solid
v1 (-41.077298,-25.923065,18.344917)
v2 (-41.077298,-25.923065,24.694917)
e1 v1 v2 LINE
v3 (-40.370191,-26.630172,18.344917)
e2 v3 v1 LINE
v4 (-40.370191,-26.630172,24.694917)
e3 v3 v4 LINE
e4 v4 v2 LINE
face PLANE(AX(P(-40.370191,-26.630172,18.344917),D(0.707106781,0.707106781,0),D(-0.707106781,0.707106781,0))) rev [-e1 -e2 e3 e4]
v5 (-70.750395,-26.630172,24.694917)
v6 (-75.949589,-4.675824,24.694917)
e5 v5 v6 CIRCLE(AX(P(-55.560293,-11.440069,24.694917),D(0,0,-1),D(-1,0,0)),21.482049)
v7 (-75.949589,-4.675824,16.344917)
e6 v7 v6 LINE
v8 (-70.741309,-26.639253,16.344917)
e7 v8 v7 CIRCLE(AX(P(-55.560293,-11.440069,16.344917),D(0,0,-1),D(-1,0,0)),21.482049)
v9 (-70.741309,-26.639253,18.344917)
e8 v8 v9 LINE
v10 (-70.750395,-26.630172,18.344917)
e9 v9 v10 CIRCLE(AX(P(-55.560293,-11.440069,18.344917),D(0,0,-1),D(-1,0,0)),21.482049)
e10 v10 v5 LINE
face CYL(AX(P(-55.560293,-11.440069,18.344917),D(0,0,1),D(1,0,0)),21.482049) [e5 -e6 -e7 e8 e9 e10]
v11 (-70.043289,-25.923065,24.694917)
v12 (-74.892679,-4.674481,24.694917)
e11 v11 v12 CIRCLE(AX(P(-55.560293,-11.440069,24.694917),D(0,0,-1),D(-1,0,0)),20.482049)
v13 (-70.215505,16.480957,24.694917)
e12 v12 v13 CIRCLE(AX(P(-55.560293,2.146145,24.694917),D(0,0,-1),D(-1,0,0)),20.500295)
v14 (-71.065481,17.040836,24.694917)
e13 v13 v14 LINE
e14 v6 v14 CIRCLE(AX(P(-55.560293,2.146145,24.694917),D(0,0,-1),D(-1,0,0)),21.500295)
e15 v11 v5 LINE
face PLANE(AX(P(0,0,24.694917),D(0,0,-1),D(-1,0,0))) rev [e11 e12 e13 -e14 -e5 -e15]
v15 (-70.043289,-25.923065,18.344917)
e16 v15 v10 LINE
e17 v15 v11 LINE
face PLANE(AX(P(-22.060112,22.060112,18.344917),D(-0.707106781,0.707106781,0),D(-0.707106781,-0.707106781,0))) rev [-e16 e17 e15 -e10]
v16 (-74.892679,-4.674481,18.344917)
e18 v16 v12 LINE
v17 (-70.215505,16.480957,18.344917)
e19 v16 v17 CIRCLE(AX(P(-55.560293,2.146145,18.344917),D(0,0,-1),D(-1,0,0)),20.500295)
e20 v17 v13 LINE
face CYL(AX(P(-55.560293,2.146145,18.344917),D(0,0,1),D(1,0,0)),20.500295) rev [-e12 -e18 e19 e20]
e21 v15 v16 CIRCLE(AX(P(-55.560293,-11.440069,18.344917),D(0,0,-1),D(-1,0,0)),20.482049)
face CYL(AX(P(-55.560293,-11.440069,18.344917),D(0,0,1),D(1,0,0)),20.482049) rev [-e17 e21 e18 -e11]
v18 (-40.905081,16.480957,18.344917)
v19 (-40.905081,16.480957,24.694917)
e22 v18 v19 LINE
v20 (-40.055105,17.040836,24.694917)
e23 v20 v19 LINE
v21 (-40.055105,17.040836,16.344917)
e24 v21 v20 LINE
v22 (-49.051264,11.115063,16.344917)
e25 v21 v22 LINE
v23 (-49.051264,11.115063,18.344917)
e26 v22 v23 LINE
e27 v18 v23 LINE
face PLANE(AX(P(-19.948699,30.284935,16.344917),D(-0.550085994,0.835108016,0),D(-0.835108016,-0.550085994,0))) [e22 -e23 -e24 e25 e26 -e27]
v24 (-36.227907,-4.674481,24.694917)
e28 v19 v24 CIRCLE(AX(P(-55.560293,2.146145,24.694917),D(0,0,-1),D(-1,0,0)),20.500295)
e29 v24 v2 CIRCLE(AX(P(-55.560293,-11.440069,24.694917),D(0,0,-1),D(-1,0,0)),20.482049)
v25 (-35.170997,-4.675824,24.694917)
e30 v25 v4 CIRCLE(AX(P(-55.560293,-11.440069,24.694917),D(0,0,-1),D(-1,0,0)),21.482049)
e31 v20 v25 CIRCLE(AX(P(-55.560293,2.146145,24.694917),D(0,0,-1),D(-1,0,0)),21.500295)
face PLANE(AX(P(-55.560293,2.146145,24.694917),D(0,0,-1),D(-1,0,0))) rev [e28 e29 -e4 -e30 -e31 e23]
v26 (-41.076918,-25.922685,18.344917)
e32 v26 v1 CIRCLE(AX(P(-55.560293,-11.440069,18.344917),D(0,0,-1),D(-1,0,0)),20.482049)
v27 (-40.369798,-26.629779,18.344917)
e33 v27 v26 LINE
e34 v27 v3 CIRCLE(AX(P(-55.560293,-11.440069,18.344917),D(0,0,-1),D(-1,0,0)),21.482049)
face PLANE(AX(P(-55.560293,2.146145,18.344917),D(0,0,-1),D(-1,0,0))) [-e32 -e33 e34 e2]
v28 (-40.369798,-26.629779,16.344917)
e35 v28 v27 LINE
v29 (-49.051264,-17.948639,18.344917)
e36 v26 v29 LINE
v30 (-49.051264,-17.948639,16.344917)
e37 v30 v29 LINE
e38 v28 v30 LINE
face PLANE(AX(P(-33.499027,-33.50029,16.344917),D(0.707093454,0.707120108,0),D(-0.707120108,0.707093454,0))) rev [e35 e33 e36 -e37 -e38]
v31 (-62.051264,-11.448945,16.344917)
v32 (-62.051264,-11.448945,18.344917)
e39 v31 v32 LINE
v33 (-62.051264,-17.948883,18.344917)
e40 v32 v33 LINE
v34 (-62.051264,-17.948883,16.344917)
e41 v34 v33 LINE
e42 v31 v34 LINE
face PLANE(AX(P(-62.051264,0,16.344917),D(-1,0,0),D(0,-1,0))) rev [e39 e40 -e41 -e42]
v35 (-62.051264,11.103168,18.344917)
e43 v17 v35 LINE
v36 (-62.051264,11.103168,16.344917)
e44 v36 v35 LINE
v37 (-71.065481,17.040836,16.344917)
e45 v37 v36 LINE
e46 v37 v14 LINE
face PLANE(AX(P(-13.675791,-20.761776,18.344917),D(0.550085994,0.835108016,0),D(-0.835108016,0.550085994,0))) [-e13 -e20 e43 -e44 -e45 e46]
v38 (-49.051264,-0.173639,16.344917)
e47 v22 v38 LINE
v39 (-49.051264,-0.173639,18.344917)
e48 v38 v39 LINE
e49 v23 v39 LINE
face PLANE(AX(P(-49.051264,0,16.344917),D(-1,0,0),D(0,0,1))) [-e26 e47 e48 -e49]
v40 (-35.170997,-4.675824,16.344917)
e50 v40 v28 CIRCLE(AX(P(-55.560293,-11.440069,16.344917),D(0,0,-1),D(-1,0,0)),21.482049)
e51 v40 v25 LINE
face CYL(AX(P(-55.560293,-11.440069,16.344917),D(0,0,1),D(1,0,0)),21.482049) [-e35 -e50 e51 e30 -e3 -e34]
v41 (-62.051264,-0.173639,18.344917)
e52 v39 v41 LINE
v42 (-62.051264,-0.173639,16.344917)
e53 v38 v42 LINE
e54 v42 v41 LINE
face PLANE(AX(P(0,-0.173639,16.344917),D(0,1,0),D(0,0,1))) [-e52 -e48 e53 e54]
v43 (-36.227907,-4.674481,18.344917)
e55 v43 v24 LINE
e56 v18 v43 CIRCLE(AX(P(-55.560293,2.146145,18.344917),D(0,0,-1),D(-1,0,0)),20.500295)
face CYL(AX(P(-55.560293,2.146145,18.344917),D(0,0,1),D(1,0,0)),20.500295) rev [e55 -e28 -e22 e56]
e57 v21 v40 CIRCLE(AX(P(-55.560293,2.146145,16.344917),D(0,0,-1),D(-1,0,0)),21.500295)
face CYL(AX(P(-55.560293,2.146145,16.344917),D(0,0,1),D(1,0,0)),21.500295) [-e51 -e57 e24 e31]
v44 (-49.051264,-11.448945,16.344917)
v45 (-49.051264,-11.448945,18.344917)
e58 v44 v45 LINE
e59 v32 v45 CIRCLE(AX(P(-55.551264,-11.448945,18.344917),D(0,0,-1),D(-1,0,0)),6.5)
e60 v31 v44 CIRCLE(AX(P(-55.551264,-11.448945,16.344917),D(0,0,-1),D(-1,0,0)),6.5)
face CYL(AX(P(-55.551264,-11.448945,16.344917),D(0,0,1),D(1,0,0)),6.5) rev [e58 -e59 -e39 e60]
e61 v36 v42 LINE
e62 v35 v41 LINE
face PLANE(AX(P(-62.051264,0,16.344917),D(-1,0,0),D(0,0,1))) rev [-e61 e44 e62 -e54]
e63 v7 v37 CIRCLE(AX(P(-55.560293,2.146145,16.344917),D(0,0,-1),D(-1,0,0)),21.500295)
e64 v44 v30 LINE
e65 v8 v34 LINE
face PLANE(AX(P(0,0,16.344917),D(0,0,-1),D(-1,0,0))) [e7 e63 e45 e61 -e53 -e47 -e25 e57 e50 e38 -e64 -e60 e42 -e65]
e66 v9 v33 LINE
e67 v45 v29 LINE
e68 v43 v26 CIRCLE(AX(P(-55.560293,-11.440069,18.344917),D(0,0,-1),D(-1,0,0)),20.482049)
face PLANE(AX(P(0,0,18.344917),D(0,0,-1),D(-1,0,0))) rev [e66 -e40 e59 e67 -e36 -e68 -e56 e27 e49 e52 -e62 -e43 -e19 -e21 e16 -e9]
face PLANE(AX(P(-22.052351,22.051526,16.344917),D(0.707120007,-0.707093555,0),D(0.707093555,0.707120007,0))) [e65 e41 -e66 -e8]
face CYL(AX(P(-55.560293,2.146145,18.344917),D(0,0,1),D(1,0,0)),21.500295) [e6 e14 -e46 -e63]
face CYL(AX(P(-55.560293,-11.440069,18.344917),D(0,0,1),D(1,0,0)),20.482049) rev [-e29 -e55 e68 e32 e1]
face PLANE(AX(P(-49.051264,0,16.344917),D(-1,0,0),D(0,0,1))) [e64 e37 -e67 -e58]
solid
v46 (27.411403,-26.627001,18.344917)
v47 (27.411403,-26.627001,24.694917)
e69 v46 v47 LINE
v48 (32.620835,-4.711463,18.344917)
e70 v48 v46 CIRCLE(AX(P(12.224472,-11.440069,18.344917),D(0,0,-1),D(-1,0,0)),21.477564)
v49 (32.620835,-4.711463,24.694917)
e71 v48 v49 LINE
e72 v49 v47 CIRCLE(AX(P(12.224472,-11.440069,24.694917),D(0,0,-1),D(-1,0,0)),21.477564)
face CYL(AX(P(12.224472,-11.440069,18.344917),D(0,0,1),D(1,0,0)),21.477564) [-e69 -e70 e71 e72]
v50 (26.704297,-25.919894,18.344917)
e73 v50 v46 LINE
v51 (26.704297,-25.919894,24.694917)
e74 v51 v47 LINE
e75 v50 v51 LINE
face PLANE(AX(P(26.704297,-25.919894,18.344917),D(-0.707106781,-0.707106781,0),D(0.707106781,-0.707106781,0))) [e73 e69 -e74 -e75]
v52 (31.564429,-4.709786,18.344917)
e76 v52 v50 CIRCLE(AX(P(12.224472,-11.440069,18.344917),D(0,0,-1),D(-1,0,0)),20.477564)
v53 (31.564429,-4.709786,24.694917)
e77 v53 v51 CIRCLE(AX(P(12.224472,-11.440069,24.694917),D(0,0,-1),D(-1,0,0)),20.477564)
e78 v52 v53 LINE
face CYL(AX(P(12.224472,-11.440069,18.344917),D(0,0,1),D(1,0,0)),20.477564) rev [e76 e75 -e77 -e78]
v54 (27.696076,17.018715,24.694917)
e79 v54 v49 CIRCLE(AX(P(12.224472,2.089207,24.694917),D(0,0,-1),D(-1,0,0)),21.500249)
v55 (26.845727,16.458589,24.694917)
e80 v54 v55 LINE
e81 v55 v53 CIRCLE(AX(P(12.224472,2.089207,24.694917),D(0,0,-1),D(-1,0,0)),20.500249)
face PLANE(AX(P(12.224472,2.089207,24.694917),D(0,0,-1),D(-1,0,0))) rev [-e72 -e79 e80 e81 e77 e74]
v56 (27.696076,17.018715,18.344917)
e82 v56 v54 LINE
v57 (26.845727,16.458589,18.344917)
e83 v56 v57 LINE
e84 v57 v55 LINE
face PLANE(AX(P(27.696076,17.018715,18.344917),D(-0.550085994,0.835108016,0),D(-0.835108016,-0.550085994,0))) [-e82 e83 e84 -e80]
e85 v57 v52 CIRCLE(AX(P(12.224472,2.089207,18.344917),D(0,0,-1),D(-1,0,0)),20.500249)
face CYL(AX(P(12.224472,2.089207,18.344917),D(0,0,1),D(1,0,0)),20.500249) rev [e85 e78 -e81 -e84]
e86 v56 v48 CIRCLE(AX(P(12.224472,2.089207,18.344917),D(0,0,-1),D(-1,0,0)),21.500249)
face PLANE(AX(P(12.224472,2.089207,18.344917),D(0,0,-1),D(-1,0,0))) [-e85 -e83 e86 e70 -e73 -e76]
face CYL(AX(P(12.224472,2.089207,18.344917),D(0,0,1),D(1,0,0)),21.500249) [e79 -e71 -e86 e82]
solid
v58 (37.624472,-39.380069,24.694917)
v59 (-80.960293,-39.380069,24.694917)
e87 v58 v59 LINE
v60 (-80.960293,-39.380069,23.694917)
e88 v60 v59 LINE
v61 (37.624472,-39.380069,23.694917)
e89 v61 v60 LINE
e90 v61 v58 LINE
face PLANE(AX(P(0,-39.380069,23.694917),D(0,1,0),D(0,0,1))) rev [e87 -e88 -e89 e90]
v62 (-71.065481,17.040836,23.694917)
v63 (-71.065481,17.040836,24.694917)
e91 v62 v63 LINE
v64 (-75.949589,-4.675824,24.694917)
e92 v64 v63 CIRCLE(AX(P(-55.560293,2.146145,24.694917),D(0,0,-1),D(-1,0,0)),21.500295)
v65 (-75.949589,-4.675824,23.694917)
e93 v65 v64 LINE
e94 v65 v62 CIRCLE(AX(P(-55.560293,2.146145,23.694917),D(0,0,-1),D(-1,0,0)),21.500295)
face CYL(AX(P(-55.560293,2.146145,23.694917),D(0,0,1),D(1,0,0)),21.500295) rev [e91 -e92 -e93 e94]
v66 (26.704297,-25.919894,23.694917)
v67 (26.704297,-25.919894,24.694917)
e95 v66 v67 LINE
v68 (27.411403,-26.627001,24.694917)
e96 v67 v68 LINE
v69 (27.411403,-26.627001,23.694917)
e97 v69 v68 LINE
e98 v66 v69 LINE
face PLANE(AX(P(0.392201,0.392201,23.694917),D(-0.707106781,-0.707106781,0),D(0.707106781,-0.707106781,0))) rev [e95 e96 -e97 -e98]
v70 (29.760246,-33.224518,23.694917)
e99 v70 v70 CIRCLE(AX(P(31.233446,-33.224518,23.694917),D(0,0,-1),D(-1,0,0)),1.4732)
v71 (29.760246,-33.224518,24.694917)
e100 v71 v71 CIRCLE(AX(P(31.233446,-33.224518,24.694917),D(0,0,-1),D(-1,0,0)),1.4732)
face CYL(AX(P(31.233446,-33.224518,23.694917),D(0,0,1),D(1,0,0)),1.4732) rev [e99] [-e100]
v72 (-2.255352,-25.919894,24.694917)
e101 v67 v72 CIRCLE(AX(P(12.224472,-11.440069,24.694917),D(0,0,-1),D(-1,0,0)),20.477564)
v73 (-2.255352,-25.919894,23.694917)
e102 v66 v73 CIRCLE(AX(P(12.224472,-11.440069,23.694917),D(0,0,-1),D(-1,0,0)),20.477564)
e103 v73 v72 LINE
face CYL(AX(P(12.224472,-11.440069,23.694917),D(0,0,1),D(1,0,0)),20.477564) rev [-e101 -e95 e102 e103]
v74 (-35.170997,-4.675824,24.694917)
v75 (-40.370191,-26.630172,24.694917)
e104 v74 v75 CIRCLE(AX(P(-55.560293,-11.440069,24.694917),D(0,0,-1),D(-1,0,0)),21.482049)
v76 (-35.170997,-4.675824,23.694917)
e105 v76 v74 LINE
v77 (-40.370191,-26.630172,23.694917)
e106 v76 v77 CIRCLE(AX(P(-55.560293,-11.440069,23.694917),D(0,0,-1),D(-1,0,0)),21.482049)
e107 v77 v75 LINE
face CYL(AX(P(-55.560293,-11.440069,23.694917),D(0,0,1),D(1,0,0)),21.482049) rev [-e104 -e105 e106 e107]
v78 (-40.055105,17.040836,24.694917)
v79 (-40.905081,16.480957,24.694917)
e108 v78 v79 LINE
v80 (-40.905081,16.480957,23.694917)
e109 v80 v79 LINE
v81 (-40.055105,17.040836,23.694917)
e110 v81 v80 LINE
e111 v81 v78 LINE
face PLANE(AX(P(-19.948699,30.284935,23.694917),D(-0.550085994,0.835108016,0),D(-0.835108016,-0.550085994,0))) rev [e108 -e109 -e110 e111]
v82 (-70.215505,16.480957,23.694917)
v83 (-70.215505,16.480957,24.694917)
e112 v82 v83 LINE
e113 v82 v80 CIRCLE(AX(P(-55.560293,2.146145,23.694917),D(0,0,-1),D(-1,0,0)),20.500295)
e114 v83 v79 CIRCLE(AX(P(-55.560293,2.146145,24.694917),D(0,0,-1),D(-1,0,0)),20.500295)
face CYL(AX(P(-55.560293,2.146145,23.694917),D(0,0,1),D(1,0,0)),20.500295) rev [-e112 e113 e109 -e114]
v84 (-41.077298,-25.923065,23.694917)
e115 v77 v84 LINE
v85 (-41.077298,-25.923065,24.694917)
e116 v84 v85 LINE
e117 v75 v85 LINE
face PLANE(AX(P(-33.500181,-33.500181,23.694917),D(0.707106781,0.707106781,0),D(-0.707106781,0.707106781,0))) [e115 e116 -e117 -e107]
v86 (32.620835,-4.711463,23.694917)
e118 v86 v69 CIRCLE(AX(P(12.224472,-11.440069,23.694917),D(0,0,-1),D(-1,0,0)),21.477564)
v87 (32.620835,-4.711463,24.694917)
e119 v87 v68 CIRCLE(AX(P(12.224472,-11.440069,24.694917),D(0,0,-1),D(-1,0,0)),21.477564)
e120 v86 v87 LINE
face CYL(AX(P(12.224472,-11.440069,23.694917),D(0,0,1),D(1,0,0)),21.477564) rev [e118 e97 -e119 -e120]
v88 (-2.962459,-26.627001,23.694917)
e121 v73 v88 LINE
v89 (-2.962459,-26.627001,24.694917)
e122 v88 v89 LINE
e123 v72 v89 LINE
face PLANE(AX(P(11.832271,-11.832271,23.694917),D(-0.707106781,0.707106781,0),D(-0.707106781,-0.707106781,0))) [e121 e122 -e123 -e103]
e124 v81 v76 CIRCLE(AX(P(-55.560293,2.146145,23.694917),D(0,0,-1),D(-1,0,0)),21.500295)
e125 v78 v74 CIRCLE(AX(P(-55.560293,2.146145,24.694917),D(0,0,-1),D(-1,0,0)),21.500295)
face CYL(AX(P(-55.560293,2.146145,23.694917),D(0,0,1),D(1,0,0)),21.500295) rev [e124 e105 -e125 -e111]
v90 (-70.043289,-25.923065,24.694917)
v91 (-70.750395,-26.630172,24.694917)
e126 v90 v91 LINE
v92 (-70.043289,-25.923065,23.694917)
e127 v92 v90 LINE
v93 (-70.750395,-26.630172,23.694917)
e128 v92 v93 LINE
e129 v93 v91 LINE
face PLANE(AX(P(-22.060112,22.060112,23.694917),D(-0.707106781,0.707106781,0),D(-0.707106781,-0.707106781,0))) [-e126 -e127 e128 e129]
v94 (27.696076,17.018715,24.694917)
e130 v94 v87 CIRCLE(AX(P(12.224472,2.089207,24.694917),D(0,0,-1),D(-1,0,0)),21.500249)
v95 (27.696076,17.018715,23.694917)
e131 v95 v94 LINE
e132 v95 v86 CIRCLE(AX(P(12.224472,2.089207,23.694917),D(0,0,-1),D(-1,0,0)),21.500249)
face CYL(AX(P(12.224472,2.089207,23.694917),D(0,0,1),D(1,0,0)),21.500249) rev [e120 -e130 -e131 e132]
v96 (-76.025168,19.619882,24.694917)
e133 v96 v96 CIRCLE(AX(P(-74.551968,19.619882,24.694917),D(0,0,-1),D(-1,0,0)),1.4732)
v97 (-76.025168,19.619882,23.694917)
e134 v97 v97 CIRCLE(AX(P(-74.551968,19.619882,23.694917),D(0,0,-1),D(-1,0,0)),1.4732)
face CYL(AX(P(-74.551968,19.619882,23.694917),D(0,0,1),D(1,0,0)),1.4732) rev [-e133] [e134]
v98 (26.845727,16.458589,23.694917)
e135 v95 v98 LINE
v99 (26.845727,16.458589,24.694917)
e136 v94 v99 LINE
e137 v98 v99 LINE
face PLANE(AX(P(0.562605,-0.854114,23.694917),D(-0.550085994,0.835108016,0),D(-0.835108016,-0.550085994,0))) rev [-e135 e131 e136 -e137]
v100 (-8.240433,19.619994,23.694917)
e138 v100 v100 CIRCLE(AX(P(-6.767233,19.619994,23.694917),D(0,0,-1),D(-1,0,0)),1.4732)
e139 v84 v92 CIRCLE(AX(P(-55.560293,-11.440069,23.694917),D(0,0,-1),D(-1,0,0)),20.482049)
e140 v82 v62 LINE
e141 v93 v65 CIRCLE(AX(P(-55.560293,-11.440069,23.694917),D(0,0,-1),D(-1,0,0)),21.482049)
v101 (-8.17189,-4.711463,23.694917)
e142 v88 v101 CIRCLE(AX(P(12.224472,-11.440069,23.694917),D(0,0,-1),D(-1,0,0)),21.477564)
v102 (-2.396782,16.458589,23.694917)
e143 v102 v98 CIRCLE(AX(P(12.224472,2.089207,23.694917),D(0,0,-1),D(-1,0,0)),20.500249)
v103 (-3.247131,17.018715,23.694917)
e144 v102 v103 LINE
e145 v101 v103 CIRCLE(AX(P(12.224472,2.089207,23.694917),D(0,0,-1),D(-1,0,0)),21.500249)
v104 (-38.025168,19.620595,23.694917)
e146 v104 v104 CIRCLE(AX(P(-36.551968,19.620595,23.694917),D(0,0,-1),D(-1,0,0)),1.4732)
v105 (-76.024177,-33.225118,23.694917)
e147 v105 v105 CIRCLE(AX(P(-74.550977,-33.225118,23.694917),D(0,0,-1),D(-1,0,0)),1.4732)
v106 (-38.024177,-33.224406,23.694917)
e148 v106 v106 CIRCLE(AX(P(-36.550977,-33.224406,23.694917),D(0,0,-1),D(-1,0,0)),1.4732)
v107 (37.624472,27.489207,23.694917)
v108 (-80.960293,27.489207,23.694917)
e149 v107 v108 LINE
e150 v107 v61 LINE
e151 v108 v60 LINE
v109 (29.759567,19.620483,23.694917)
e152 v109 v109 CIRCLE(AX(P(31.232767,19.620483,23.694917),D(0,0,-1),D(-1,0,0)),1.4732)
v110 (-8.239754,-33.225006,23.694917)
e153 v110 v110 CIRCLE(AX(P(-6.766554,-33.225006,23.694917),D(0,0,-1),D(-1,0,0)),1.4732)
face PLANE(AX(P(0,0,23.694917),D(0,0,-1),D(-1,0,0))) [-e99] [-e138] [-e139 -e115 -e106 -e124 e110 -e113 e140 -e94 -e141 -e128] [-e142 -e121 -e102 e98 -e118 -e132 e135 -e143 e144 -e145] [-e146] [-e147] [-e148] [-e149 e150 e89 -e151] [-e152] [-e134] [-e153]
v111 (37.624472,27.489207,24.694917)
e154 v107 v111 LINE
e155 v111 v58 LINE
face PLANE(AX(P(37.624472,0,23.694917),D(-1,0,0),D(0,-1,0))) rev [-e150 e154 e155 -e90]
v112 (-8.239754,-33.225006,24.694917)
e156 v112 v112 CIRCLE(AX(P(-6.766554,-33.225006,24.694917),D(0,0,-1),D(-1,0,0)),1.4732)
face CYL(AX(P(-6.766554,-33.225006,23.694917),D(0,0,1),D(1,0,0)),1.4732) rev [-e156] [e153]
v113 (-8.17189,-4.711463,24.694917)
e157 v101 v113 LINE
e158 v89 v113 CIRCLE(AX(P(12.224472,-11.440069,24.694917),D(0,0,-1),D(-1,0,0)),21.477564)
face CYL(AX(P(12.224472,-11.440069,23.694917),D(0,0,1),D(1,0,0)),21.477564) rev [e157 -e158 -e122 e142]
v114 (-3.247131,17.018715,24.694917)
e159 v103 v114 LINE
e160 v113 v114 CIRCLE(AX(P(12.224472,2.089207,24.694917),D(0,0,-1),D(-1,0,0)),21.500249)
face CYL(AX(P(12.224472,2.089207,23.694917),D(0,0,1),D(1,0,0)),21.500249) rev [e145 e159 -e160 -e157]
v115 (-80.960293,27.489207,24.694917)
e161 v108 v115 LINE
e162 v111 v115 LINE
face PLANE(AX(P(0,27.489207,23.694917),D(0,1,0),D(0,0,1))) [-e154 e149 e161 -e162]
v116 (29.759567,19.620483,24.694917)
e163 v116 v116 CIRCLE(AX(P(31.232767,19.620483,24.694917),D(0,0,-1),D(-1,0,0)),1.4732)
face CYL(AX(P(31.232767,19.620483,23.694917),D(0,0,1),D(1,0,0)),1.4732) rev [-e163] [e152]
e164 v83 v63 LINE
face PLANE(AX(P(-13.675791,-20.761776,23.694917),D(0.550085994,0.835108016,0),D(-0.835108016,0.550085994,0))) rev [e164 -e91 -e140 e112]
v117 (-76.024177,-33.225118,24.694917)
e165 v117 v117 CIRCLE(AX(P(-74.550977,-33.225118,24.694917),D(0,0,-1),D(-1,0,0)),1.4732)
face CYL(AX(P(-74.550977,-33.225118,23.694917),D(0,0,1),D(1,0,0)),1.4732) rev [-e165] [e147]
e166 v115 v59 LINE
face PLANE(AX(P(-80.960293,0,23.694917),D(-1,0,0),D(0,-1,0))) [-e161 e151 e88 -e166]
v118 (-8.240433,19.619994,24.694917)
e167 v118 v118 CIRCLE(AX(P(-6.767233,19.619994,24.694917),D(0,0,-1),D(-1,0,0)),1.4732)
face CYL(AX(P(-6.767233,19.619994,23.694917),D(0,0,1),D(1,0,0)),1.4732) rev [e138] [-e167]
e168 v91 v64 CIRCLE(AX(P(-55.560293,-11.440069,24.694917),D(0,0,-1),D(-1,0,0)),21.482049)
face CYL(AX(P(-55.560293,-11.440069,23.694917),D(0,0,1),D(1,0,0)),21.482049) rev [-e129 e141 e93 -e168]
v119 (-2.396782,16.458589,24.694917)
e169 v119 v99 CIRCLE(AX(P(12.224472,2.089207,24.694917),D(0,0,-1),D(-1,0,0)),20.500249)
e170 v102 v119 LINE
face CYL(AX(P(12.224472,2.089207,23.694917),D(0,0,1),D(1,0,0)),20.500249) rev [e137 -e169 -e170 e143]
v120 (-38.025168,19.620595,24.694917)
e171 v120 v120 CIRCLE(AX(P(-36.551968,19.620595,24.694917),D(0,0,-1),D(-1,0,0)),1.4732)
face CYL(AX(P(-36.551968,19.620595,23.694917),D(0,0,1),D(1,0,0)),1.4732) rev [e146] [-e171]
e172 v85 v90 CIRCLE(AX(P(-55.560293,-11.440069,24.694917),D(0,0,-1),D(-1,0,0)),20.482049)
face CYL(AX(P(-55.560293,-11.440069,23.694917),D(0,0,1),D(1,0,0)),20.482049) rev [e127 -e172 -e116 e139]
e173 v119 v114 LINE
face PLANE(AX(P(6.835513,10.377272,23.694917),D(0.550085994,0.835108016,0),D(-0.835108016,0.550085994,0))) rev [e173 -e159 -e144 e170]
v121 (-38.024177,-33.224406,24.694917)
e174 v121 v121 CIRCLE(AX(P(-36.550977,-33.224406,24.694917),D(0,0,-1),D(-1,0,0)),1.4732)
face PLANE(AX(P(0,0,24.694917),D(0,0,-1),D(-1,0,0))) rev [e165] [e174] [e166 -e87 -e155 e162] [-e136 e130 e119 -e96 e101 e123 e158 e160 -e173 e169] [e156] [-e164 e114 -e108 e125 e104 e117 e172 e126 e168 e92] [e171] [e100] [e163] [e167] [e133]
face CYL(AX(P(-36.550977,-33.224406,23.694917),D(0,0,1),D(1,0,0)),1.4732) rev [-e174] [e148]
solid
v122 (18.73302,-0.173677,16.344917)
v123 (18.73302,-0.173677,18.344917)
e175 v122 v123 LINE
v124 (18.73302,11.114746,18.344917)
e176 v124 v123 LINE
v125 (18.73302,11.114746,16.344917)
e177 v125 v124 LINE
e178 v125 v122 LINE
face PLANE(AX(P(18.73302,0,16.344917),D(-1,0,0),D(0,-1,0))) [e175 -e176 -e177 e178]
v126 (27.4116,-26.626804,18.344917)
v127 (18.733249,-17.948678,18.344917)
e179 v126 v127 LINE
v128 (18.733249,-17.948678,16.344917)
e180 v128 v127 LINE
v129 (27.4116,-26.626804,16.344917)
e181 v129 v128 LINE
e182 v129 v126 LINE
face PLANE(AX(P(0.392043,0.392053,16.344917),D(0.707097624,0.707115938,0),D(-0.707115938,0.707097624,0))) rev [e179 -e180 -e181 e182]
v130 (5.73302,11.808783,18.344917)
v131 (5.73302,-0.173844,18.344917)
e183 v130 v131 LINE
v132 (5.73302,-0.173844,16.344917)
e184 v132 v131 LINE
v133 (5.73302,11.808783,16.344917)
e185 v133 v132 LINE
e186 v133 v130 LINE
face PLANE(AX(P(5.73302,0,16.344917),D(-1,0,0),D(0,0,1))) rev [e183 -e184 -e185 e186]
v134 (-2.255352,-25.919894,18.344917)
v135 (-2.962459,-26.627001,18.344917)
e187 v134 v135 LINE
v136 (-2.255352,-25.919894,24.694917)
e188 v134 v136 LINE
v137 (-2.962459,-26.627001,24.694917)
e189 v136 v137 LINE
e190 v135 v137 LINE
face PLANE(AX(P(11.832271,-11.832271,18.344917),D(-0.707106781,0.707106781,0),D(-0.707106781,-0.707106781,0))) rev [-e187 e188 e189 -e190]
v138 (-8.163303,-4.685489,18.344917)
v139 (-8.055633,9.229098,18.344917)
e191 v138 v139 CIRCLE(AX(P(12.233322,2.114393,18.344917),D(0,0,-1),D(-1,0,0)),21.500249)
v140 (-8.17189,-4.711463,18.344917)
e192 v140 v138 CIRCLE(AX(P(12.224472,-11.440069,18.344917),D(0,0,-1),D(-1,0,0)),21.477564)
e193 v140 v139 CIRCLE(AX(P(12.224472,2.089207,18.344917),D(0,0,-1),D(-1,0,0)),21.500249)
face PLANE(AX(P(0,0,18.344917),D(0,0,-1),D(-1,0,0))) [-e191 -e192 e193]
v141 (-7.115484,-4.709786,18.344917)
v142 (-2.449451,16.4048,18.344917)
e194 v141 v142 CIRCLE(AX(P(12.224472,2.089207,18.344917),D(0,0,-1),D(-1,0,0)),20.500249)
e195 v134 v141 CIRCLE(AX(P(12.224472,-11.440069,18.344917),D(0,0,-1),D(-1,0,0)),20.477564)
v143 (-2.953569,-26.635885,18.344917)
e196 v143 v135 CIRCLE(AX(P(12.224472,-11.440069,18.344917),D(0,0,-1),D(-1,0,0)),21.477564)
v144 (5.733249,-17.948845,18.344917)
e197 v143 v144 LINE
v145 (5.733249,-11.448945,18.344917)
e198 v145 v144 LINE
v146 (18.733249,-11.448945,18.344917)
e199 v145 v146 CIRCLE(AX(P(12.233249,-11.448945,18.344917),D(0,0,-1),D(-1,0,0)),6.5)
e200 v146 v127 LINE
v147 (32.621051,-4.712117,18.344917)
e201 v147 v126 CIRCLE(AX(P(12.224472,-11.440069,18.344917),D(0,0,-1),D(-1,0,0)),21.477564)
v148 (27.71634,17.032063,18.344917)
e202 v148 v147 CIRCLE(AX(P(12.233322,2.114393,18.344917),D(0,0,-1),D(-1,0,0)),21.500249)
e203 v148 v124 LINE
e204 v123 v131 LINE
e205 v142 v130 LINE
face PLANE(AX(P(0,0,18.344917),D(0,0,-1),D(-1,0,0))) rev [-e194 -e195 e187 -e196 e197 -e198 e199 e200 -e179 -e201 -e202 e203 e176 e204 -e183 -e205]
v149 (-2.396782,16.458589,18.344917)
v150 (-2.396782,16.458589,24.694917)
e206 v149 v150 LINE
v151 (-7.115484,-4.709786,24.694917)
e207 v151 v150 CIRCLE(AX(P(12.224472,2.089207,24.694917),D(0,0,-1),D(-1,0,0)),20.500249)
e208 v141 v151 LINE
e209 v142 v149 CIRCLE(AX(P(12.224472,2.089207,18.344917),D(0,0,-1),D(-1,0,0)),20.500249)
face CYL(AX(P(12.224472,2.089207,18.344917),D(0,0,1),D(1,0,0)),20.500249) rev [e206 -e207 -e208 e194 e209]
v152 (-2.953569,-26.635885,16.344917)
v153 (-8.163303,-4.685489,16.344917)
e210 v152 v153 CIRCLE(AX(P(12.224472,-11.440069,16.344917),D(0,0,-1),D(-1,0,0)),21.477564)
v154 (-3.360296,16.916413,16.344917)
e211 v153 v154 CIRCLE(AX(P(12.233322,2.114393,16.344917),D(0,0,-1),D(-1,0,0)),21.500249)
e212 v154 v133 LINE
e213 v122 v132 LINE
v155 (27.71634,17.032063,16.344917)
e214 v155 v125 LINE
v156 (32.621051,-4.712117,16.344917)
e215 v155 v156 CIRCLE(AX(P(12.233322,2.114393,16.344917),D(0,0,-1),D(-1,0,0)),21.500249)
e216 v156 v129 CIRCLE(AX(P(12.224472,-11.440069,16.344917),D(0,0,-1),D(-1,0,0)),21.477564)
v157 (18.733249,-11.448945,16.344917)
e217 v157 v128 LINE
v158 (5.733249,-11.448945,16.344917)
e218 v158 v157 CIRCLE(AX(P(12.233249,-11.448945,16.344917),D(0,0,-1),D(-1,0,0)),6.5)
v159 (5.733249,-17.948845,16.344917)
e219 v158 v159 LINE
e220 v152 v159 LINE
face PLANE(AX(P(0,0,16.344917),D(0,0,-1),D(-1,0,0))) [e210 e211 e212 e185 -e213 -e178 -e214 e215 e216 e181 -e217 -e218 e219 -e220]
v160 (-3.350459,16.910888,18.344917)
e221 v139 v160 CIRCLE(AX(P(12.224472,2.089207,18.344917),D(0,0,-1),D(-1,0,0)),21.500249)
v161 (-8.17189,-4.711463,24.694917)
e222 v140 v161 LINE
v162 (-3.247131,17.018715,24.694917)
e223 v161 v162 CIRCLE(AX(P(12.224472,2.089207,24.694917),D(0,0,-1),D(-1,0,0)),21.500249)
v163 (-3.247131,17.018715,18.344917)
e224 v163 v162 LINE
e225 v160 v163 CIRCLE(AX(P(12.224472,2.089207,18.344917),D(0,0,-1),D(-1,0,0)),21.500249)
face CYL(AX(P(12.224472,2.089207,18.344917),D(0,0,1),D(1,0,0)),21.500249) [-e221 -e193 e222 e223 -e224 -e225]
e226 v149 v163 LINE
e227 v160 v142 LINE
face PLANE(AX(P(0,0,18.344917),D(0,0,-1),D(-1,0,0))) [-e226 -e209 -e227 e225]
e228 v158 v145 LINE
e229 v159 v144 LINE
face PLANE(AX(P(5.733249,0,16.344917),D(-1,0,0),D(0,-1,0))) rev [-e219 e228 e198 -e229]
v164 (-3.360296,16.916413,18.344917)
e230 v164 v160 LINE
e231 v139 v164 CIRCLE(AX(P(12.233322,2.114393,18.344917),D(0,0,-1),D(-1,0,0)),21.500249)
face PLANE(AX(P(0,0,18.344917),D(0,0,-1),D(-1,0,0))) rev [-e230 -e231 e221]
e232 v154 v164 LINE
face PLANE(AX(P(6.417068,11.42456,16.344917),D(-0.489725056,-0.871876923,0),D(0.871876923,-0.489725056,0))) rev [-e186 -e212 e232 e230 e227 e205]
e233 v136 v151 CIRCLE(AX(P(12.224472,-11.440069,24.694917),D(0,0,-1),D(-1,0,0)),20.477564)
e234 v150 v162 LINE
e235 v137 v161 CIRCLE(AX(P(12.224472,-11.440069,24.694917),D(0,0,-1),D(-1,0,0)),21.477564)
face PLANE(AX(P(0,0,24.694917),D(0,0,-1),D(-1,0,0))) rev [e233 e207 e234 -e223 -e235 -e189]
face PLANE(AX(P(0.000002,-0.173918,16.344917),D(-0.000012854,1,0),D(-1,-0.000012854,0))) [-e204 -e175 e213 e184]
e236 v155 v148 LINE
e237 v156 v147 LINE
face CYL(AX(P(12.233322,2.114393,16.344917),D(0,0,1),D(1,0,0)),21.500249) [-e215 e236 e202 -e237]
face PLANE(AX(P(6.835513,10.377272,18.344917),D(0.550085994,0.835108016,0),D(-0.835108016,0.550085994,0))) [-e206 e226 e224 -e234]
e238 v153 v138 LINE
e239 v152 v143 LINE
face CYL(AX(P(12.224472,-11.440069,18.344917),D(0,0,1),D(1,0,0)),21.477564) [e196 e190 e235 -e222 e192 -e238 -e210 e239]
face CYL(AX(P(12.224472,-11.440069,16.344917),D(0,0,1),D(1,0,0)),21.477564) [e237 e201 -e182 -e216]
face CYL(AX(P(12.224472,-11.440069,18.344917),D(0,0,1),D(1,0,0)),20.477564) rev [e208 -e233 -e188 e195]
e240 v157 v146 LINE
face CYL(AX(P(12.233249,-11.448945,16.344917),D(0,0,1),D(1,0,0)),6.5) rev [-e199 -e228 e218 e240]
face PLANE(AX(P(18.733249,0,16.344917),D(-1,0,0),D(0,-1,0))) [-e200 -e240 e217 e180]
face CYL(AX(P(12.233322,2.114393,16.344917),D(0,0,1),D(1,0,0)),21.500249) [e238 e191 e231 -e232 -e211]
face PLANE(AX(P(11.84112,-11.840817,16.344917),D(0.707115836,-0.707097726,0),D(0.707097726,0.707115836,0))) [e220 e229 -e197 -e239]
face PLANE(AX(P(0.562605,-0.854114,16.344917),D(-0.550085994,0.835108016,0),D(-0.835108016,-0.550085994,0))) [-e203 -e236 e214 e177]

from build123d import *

# Parameters (mm, degrees)
BOSS_EXTRUDE1_DEPTH   = 6.35
BOSS_EXTRUDE1_2_DEPTH = 6.35
BOSS_EXTRUDE1_3_DEPTH = 6.35
BOSS_EXTRUDE1_4_DEPTH = 6.35
SKETCH1_5_W           = 118.584765391
SKETCH1_5_H           = 66.869276247
SKETCH1_5_R           = 1.4732
BOSS_EXTRUDE7_DEPTH   = 1
BOSS_EXTRUDE8_DEPTH   = 2


with BuildPart() as part:
    # Sketch1 → Boss-Extrude1 (new body)
    with BuildSketch(Plane(origin=(0, 0, 24.694917193), x_dir=(-1, 0, 0), z_dir=(0, 0, -1))):
        with BuildLine():
            Line((-27.411403448, -26.627000625), (-26.704296667, -25.919893844))
            ThreePointArc((-26.704296667, -25.919893844), (-32.184721764, -16.013806308), (-31.564428782, -4.709786398))
            ThreePointArc((-31.564428782, -4.709786398), (-32.233619939, 6.549502204), (-26.845726601, 16.458589045))
            Line((-26.845726601, 16.458589045), (-27.696075992, 17.018714539))
            ThreePointArc((-27.696075992, 17.018714539), (-33.192970324, 6.841344605), (-32.620835017, -4.711463161))
            ThreePointArc((-32.620835017, -4.711463161), (-33.119816188, -16.406995999), (-27.411403448, -26.627000625))
        make_face()
    extrude(amount=BOSS_EXTRUDE1_DEPTH)


with BuildPart() as body_2:
    # Sketch1 → Boss-Extrude1 2 (new body)
    with BuildSketch(Plane(origin=(0, 0, 24.694917193), x_dir=(-1, 0, 0), z_dir=(0, 0, -1))):
        with BuildLine():
            ThreePointArc((7.115484162, -4.709786398), (7.735777145, -16.013806308), (2.255352047, -25.919893844))
            Line((2.255352047, -25.919893844), (2.962458828, -26.627000625))
            ThreePointArc((2.962458828, -26.627000625), (8.670871569, -16.406995999), (8.171890397, -4.711463161))
            ThreePointArc((8.171890397, -4.711463161), (8.744025704, 6.841344604), (3.247131374, 17.018714539))
            Line((3.247131374, 17.018714539), (2.396781982, 16.458589044))
            ThreePointArc((2.396781982, 16.458589044), (7.78467532, 6.549502204), (7.115484162, -4.709786398))
        make_face()
    extrude(amount=BOSS_EXTRUDE1_2_DEPTH)


with BuildPart() as body_3:
    # Sketch1 → Boss-Extrude1 3 (new body)
    with BuildSketch(Plane(origin=(0, 0, 24.694917193), x_dir=(-1, 0, 0), z_dir=(0, 0, -1))):
        with BuildLine():
            Line((40.905080795, 16.480957305), (40.055105354, 17.040836478))
            ThreePointArc((40.055105354, 17.040836478), (34.583953243, 6.863754684), (35.170996775, -4.675824129))
            ThreePointArc((35.170996775, -4.675824129), (34.656423866, -16.390490779), (40.370190726, -26.630171843))
            Line((40.370190726, -26.630171843), (41.077297507, -25.923065062))
            ThreePointArc((41.077297507, -25.923065062), (35.59167816, -15.997342767), (36.227907399, -4.674481156))
            ThreePointArc((36.227907399, -4.674481156), (35.543366543, 6.571609557), (40.905080795, 16.480957305))
        make_face()
    extrude(amount=BOSS_EXTRUDE1_3_DEPTH)


with BuildPart() as body_4:
    # Sketch1 → Boss-Extrude1 4 (new body)
    with BuildSketch(Plane(origin=(0, 0, 24.694917193), x_dir=(-1, 0, 0), z_dir=(0, 0, -1))):
        with BuildLine():
            Line((71.065480809, 17.040836478), (70.215505368, 16.480957305))
            ThreePointArc((70.215505368, 16.480957305), (75.57721962, 6.571609557), (74.892678764, -4.674481156))
            ThreePointArc((74.892678764, -4.674481156), (75.528908003, -15.997342767), (70.043288656, -25.923065062))
            Line((70.043288656, -25.923065062), (70.750395437, -26.630171843))
            ThreePointArc((70.750395437, -26.630171843), (76.464162297, -16.390490779), (75.949589388, -4.675824129))
            ThreePointArc((75.949589388, -4.675824129), (76.536632919, 6.863754684), (71.065480809, 17.040836478))
        make_face()
    extrude(amount=BOSS_EXTRUDE1_4_DEPTH)


    add(body_3.part)  # Boss-Extrude8 merges body 3

    add(body_2.part)  # Boss-Extrude8 merges body 2
    # Sketch4 → Boss-Extrude8 (add)
    with BuildSketch(Plane(origin=(0, 0, 18.344917193), x_dir=(-1, 0, 0), z_dir=(0, 0, -1))):
        with BuildLine():
            ThreePointArc((35.170996775, -4.675824129), (34.656359811, -16.39022029), (40.369797621, -26.629778728))
            Line((40.369797621, -26.629778728), (49.051264407, -17.948639189))
            Line((49.051264407, -17.948639189), (49.051264407, -11.448944696))
            ThreePointArc((49.051264407, -11.448944696), (55.551264423, -4.948944679), (62.05126444, -11.448944696))
            Line((62.05126444, -11.448944696), (62.05126444, -17.948882965))
            Line((62.05126444, -17.948882965), (70.741309119, -26.639252729))
            ThreePointArc((70.741309119, -26.639252729), (76.4626812, -16.39674076), (75.949589388, -4.675824129))
            ThreePointArc((75.949589388, -4.675824129), (76.536632919, 6.863754684), (71.065480809, 17.040836478))
            Line((71.065480809, 17.040836478), (62.05126444, 11.103168443))
            Line((62.05126444, 11.103168443), (62.05126444, -0.173638647))
            Line((62.05126444, -0.173638647), (49.051264407, -0.173638647))
            Line((49.051264407, -0.173638647), (49.051264407, 11.115062804))
            Line((49.051264407, 11.115062804), (40.055105354, 17.040836478))
            ThreePointArc((40.055105354, 17.040836478), (34.583953243, 6.863754684), (35.170996775, -4.675824129))
        make_face()
        with BuildLine():
            Line((-18.733020444, -0.17367699), (-18.733020444, 11.114746157))
            Line((-18.733020444, 11.114746157), (-27.716340173, 17.032062564))
            ThreePointArc((-27.716340173, 17.032062564), (-33.206637308, 6.845224023), (-32.621050686, -4.712116951))
            ThreePointArc((-32.621050686, -4.712116951), (-33.119768742, -16.407195595), (-27.411600112, -26.626803958))
            Line((-27.411600112, -26.626803958), (-18.733248921, -17.948677527))
            Line((-18.733248921, -17.948677527), (-18.733248921, -11.448944686))
            ThreePointArc((-18.733248921, -11.448944686), (-12.233248904, -4.948944669), (-5.733248887, -11.448944686))
            Line((-5.733248887, -11.448944686), (-5.733248887, -17.948844627))
            Line((-5.733248887, -17.948844627), (2.953569125, -26.635885128))
            ThreePointArc((2.953569125, -26.635885128), (8.672580304, -16.399802024), (8.163303461, -4.685489272))
            ThreePointArc((8.163303461, -4.685489272), (8.754411469, 6.780844689), (3.360296242, 16.916412955))
            Line((3.360296242, 16.916412955), (-5.73302041, 11.808782641))
            Line((-5.73302041, 11.808782641), (-5.73302041, -0.17384409))
            Line((-5.73302041, -0.17384409), (-18.733020444, -0.17367699))
        make_face()
    extrude(amount=BOSS_EXTRUDE8_DEPTH)


with BuildPart() as body_5:
    # Sketch1<5> → Boss-Extrude7 (new body)
    with BuildSketch(Plane(origin=(0, 0, 24.694917193), x_dir=(-1, 0, 0), z_dir=(0, 0, -1))):
        with Locations((21.667910386, -5.945431363)):
            Rectangle(SKETCH1_5_W, SKETCH1_5_H)
        with Locations((-31.233446035, -33.224517796)):
            Circle(SKETCH1_5_R, mode=Mode.SUBTRACT)
        with Locations((6.766553887, -33.225006242)):
            Circle(SKETCH1_5_R, mode=Mode.SUBTRACT)
        with Locations((36.550977194, -33.224405729)):
            Circle(SKETCH1_5_R, mode=Mode.SUBTRACT)
        with Locations((74.550977113, -33.225118305)):
            Circle(SKETCH1_5_R, mode=Mode.SUBTRACT)
        with BuildLine():
            ThreePointArc((2.255352047, -25.919893844), (-12.22447231, -31.917633473), (-26.704296667, -25.919893844))
            Line((-26.704296667, -25.919893844), (-27.411403448, -26.627000625))
            ThreePointArc((-27.411403448, -26.627000625), (-33.119816188, -16.406995999), (-32.620835017, -4.711463161))
            ThreePointArc((-32.620835017, -4.711463161), (-33.192970324, 6.841344605), (-27.696075992, 17.018714539))
            Line((-27.696075992, 17.018714539), (-26.845726601, 16.458589045))
            ThreePointArc((-26.845726601, 16.458589045), (-12.224472309, 22.589456132), (2.396781982, 16.458589044))
            Line((2.396781982, 16.458589044), (3.247131374, 17.018714539))
            ThreePointArc((3.247131374, 17.018714539), (8.744025704, 6.841344604), (8.171890397, -4.711463161))
            ThreePointArc((8.171890397, -4.711463161), (8.670871569, -16.406995999), (2.962458828, -26.627000625))
            Line((2.962458828, -26.627000625), (2.255352047, -25.919893844))
        make_face(mode=Mode.SUBTRACT)
        with Locations((-31.232766774, 19.620482705)):
            Circle(SKETCH1_5_R, mode=Mode.SUBTRACT)
        with Locations((6.767233148, 19.619994259)):
            Circle(SKETCH1_5_R, mode=Mode.SUBTRACT)
        with BuildLine():
            ThreePointArc((35.170996775, -4.675824129), (34.583953243, 6.863754684), (40.055105354, 17.040836478))
            Line((40.055105354, 17.040836478), (40.905080795, 16.480957305))
            ThreePointArc((40.905080795, 16.480957305), (55.560293081, 22.646439997), (70.215505368, 16.480957305))
            Line((70.215505368, 16.480957305), (71.065480809, 17.040836478))
            ThreePointArc((71.065480809, 17.040836478), (76.536632919, 6.863754684), (75.949589388, -4.675824129))
            ThreePointArc((75.949589388, -4.675824129), (76.464162297, -16.390490779), (70.750395437, -26.630171843))
            Line((70.750395437, -26.630171843), (70.043288656, -25.923065062))
            ThreePointArc((70.043288656, -25.923065062), (55.560293081, -31.922118252), (41.077297507, -25.923065062))
            Line((41.077297507, -25.923065062), (40.370190726, -26.630171843))
            ThreePointArc((40.370190726, -26.630171843), (34.656423866, -16.390490779), (35.170996775, -4.675824129))
        make_face(mode=Mode.SUBTRACT)
        with Locations((36.551968143, 19.620594767)):
            Circle(SKETCH1_5_R, mode=Mode.SUBTRACT)
        with Locations((74.551968061, 19.619882191)):
            Circle(SKETCH1_5_R, mode=Mode.SUBTRACT)
    extrude(amount=BOSS_EXTRUDE7_DEPTH)


solid = Compound([part.part, body_4.part, body_5.part])
